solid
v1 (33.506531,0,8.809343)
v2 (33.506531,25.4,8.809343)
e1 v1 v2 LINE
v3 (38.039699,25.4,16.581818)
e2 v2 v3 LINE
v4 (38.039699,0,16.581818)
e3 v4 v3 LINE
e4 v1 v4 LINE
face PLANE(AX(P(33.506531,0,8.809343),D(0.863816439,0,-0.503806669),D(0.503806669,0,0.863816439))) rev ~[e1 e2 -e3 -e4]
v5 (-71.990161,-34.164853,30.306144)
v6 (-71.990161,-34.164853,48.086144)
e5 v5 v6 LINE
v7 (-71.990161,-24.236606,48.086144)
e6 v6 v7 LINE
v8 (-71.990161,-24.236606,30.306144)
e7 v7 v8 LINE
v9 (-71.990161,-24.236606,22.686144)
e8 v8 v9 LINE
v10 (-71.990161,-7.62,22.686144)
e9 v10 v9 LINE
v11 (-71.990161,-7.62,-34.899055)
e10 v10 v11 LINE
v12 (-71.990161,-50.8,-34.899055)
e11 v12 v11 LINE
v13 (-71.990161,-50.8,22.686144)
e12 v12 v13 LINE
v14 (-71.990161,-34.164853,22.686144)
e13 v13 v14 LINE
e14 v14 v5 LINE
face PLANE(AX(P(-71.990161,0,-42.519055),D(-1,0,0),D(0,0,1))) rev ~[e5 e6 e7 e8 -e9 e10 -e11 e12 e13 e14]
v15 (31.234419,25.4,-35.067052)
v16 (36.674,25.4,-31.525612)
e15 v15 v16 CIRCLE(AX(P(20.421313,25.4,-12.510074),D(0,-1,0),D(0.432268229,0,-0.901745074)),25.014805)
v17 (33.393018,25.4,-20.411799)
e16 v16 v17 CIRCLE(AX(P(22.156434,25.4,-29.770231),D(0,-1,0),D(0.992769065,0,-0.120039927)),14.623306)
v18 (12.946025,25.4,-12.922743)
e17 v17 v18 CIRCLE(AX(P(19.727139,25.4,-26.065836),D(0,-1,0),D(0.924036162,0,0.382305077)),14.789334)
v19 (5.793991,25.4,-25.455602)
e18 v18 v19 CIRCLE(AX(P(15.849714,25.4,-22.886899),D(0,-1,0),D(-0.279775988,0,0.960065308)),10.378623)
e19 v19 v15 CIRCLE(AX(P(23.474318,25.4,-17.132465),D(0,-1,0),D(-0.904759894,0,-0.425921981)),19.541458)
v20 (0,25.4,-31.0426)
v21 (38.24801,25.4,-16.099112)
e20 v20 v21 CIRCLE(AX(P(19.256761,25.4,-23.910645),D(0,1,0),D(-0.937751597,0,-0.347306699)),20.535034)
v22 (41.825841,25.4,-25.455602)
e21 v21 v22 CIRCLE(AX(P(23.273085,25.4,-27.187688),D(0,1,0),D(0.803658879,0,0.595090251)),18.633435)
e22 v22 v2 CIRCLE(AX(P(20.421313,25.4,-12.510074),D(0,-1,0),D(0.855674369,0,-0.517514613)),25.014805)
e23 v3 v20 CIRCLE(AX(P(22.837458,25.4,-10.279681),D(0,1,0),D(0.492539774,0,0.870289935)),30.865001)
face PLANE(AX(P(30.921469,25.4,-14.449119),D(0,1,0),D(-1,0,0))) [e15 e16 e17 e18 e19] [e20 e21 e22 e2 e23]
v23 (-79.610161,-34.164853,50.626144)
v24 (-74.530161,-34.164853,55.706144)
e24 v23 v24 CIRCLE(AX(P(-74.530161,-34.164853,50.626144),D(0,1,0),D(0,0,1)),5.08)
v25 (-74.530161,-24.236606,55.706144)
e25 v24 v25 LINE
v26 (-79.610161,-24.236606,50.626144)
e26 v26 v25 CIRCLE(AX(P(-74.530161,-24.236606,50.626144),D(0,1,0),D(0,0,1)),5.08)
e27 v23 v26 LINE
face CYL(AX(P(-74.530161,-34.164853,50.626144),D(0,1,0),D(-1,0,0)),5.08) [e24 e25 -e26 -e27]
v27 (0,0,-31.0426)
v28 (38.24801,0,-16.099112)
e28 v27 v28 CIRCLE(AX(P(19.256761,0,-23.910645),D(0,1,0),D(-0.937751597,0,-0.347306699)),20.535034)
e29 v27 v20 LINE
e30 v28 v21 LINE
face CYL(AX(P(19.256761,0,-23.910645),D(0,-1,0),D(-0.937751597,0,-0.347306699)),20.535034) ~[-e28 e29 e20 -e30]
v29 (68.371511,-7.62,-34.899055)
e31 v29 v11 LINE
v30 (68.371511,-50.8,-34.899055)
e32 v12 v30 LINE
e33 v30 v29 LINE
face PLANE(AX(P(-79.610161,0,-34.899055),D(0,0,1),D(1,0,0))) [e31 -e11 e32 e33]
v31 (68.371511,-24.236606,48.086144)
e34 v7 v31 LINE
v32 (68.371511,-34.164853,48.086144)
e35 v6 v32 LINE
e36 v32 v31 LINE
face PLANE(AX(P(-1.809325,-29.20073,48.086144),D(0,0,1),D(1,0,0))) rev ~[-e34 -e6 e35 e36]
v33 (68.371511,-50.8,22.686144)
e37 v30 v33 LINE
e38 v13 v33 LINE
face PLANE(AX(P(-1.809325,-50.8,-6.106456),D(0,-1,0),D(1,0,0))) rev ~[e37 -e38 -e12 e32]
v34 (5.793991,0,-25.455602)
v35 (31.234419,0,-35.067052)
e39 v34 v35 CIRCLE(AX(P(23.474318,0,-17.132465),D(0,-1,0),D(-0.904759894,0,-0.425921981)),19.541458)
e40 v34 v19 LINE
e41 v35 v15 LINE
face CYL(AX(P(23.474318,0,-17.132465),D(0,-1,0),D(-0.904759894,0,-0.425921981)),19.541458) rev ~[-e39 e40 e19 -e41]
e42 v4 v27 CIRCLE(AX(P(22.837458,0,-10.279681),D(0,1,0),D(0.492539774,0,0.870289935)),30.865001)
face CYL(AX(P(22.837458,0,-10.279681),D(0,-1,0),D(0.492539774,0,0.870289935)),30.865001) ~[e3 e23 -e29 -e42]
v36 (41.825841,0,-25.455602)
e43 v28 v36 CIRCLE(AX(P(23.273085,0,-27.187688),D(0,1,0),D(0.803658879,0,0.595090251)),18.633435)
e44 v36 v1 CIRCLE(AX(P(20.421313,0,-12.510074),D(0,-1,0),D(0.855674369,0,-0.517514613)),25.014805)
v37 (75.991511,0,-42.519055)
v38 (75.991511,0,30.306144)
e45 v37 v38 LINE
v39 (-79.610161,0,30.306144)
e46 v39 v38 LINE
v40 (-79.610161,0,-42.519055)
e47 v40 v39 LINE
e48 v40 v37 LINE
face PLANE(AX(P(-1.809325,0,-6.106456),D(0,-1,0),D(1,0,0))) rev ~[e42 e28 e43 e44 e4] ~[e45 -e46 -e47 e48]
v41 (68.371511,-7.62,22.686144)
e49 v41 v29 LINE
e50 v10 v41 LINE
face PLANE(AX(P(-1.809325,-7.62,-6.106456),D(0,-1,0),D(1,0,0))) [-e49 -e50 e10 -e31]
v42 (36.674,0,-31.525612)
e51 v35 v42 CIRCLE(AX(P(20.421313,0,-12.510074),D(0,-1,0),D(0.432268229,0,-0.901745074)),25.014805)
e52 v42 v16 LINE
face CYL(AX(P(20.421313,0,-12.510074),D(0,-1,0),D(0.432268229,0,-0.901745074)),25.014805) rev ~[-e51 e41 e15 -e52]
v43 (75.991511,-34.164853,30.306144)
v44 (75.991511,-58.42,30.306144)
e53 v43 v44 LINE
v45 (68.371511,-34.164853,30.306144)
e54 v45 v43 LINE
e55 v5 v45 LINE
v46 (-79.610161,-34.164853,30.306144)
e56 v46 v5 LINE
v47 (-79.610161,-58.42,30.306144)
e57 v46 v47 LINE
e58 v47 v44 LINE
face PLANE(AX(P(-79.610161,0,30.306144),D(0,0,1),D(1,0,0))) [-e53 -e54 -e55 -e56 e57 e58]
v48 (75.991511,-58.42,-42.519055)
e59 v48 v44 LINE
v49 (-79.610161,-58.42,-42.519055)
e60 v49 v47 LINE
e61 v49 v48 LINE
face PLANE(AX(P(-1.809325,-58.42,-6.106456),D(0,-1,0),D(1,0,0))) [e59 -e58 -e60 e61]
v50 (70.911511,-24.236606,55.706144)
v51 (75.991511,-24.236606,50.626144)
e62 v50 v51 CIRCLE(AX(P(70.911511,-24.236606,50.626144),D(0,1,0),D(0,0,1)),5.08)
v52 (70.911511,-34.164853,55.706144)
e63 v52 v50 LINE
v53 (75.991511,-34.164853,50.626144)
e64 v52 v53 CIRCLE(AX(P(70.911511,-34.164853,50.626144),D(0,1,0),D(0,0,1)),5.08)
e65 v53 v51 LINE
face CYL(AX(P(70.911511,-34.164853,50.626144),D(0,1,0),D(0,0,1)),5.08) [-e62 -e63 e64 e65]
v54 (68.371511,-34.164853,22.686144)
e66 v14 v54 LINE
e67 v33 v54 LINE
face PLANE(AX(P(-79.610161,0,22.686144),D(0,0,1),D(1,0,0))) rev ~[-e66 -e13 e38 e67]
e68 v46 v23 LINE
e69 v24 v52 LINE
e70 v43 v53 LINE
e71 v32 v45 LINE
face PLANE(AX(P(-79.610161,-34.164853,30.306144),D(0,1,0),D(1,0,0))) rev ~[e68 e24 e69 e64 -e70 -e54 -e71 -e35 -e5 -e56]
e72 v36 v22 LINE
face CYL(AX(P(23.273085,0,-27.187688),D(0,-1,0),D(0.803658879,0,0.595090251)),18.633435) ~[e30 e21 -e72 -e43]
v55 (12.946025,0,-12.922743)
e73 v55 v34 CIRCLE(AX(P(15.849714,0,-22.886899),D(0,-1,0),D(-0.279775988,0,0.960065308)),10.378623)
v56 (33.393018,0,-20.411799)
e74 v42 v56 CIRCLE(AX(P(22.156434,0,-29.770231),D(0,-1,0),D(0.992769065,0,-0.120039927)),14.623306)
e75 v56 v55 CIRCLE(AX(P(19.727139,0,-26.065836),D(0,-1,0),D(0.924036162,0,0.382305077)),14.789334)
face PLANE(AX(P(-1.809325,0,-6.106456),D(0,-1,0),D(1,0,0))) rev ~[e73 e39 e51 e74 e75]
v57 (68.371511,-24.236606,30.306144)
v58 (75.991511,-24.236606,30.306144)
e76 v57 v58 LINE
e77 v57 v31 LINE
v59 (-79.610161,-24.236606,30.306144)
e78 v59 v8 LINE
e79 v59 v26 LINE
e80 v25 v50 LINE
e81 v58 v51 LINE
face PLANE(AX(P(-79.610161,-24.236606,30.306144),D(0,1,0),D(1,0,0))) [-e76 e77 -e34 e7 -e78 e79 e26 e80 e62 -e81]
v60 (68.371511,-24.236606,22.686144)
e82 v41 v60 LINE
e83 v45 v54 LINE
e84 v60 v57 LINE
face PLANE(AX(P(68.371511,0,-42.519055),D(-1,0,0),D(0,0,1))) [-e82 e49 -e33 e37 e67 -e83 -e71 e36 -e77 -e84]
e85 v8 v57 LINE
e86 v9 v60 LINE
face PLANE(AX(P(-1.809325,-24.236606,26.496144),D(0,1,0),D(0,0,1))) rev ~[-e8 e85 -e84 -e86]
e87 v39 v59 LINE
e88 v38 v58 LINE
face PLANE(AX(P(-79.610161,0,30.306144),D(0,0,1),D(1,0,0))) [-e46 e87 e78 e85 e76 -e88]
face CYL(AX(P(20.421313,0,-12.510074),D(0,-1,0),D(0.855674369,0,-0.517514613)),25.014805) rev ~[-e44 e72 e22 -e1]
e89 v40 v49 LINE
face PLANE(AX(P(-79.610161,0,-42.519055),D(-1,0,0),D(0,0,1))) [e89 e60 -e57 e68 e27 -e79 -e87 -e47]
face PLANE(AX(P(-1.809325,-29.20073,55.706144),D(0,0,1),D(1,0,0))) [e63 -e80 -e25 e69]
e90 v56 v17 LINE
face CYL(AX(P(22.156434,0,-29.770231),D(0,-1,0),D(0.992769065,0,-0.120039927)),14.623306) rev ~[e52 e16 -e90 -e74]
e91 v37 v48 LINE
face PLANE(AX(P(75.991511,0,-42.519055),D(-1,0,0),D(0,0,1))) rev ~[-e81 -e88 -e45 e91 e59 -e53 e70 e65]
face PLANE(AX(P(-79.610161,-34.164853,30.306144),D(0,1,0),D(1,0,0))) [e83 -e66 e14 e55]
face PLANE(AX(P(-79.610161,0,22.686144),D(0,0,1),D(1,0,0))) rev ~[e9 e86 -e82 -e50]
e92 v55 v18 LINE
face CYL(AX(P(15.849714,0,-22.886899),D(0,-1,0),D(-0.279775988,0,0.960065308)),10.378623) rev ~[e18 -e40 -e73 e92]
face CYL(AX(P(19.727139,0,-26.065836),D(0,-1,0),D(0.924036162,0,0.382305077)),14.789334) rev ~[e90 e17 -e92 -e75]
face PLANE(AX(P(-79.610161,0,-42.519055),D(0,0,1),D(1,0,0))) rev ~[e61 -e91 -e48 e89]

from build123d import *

# Parameters (mm, degrees)
F0_W     = 155.6016728282
F0_H     = 72.8251989931
F1_DEPTH = 58.42
F2_W     = 155.6016728282
F2_H     = 9.92824696
F3_DEPTH = 25.4
F4_T     = 7.62
F5_R     = 5.08
F8_DEPTH = 25.4


# Not quite as in the source:
# - two fillets or chamfers of one size are made in one step
# - a shell that OpenCascade refuses in one call is made with other operations: the cavity is built on its own and cut out


with BuildPart() as f1:
    # F0 (on Front) → F1 (new body)
    with BuildSketch(Plane.XZ):
        with Locations((-1.8093250692, -6.1064558104)):
            Rectangle(F0_W, F0_H)
    extrude(amount=F1_DEPTH)

    # F2 (on face) → F3 (join)
    with BuildSketch(Plane.XY.offset(30.3061436862)):
        with Locations((-1.8093250692, -29.200729914)):
            Rectangle(F2_W, F2_H)
    extrude(amount=F3_DEPTH)

    # F4: shell of thickness 7.62, made by hand


with BuildPart() as f4_core1:
    # F4_t2: copy of F1
    add(f1.part)

    # the walls: a layer under each face that stays
    f4_faces = [f4_core1.faces().sort_by_distance(p)[0] for p in [
        (-1.8093250692, -12.118303217, 30.3061436862),
        (-1.8093250692, 0, -6.1064558104),
        (-79.6101614833, -29.21, 6.5935441896),
        (75.9915113449, -29.21, 6.5935441896),
        (-1.8093250692, -29.21, -42.5190553069),
        (-1.8093250692, -46.292426697, 30.3061436862),
        (-1.8093250692, -58.42, -6.1064558104),
        (-1.8093250692, -29.200729914, 55.7061436862),
    ]]
    thicken(f4_faces, amount=-F4_T, mode=Mode.SUBTRACT)


with BuildPart() as f1_1:
    add(f1.part)

    # what is left inside the walls is the cavity
    f4_cavity = [f4_core1.part.solids().sort_by_distance(p)[0] for p in [
        (-1.809325, -50.7238, -15.703989),
    ]]
    add(f4_cavity, mode=Mode.SUBTRACT)

    # F5
    f5_edges = [f1_1.edges().sort_by_distance(p)[0] for p in [
        (75.991511, -29.20073, 55.706144),
        (-79.610161, -29.20073, 55.706144),
    ]]
    fillet(f5_edges, radius=F5_R)

    # F7 (on face) → F8 (join)
    with BuildSketch(Plane(origin=(0, 0, 0), x_dir=(-1, 0, 0), z_dir=(0, 1, 0))):
        with BuildLine():
            Line((-33.5065312684, 8.8093429804), (-38.0396991968, 16.5818184614))
            ThreePointArc((-38.0396991968, 16.5818184614), (-46.9537485501, -29.5424136332), (0, -31.0426000506))
            ThreePointArc((0, -31.0426000506), (-11.7838373022, -4.7836219306), (-38.2480099797, -16.0991121083))
            ThreePointArc((-38.2480099797, -16.0991121083), (-40.6774615304, -20.5324220373), (-41.8258410886, -25.4556015134))
            ThreePointArc((-41.8258410886, -25.4556015134), (-44.7298971339, -6.6081053321), (-33.5065312684, 8.8093429804))
        make_face()
        with BuildLine():
            ThreePointArc((-31.2344189733, -35.0670516491), (-34.0695631474, -33.473512911), (-36.6739996827, -31.5256118532))
            ThreePointArc((-36.6739996827, -31.5256118532), (-36.1813498713, -25.629843598), (-33.3930179477, -20.4117987305))
            ThreePointArc((-33.3930179477, -20.4117987305), (-24.8135406655, -12.1786870208), (-12.9460245371, -12.9227433354))
            ThreePointArc((-12.9460245371, -12.9227433354), (-6.8355734632, -17.7428655691), (-5.7939905673, -25.4556015134))
            ThreePointArc((-5.7939905673, -25.4556015134), (-16.5679645446, -35.4128057466), (-31.2344189733, -35.0670516491))
        make_face(mode=Mode.SUBTRACT)
    extrude(amount=F8_DEPTH)


solid = f1_1.part
